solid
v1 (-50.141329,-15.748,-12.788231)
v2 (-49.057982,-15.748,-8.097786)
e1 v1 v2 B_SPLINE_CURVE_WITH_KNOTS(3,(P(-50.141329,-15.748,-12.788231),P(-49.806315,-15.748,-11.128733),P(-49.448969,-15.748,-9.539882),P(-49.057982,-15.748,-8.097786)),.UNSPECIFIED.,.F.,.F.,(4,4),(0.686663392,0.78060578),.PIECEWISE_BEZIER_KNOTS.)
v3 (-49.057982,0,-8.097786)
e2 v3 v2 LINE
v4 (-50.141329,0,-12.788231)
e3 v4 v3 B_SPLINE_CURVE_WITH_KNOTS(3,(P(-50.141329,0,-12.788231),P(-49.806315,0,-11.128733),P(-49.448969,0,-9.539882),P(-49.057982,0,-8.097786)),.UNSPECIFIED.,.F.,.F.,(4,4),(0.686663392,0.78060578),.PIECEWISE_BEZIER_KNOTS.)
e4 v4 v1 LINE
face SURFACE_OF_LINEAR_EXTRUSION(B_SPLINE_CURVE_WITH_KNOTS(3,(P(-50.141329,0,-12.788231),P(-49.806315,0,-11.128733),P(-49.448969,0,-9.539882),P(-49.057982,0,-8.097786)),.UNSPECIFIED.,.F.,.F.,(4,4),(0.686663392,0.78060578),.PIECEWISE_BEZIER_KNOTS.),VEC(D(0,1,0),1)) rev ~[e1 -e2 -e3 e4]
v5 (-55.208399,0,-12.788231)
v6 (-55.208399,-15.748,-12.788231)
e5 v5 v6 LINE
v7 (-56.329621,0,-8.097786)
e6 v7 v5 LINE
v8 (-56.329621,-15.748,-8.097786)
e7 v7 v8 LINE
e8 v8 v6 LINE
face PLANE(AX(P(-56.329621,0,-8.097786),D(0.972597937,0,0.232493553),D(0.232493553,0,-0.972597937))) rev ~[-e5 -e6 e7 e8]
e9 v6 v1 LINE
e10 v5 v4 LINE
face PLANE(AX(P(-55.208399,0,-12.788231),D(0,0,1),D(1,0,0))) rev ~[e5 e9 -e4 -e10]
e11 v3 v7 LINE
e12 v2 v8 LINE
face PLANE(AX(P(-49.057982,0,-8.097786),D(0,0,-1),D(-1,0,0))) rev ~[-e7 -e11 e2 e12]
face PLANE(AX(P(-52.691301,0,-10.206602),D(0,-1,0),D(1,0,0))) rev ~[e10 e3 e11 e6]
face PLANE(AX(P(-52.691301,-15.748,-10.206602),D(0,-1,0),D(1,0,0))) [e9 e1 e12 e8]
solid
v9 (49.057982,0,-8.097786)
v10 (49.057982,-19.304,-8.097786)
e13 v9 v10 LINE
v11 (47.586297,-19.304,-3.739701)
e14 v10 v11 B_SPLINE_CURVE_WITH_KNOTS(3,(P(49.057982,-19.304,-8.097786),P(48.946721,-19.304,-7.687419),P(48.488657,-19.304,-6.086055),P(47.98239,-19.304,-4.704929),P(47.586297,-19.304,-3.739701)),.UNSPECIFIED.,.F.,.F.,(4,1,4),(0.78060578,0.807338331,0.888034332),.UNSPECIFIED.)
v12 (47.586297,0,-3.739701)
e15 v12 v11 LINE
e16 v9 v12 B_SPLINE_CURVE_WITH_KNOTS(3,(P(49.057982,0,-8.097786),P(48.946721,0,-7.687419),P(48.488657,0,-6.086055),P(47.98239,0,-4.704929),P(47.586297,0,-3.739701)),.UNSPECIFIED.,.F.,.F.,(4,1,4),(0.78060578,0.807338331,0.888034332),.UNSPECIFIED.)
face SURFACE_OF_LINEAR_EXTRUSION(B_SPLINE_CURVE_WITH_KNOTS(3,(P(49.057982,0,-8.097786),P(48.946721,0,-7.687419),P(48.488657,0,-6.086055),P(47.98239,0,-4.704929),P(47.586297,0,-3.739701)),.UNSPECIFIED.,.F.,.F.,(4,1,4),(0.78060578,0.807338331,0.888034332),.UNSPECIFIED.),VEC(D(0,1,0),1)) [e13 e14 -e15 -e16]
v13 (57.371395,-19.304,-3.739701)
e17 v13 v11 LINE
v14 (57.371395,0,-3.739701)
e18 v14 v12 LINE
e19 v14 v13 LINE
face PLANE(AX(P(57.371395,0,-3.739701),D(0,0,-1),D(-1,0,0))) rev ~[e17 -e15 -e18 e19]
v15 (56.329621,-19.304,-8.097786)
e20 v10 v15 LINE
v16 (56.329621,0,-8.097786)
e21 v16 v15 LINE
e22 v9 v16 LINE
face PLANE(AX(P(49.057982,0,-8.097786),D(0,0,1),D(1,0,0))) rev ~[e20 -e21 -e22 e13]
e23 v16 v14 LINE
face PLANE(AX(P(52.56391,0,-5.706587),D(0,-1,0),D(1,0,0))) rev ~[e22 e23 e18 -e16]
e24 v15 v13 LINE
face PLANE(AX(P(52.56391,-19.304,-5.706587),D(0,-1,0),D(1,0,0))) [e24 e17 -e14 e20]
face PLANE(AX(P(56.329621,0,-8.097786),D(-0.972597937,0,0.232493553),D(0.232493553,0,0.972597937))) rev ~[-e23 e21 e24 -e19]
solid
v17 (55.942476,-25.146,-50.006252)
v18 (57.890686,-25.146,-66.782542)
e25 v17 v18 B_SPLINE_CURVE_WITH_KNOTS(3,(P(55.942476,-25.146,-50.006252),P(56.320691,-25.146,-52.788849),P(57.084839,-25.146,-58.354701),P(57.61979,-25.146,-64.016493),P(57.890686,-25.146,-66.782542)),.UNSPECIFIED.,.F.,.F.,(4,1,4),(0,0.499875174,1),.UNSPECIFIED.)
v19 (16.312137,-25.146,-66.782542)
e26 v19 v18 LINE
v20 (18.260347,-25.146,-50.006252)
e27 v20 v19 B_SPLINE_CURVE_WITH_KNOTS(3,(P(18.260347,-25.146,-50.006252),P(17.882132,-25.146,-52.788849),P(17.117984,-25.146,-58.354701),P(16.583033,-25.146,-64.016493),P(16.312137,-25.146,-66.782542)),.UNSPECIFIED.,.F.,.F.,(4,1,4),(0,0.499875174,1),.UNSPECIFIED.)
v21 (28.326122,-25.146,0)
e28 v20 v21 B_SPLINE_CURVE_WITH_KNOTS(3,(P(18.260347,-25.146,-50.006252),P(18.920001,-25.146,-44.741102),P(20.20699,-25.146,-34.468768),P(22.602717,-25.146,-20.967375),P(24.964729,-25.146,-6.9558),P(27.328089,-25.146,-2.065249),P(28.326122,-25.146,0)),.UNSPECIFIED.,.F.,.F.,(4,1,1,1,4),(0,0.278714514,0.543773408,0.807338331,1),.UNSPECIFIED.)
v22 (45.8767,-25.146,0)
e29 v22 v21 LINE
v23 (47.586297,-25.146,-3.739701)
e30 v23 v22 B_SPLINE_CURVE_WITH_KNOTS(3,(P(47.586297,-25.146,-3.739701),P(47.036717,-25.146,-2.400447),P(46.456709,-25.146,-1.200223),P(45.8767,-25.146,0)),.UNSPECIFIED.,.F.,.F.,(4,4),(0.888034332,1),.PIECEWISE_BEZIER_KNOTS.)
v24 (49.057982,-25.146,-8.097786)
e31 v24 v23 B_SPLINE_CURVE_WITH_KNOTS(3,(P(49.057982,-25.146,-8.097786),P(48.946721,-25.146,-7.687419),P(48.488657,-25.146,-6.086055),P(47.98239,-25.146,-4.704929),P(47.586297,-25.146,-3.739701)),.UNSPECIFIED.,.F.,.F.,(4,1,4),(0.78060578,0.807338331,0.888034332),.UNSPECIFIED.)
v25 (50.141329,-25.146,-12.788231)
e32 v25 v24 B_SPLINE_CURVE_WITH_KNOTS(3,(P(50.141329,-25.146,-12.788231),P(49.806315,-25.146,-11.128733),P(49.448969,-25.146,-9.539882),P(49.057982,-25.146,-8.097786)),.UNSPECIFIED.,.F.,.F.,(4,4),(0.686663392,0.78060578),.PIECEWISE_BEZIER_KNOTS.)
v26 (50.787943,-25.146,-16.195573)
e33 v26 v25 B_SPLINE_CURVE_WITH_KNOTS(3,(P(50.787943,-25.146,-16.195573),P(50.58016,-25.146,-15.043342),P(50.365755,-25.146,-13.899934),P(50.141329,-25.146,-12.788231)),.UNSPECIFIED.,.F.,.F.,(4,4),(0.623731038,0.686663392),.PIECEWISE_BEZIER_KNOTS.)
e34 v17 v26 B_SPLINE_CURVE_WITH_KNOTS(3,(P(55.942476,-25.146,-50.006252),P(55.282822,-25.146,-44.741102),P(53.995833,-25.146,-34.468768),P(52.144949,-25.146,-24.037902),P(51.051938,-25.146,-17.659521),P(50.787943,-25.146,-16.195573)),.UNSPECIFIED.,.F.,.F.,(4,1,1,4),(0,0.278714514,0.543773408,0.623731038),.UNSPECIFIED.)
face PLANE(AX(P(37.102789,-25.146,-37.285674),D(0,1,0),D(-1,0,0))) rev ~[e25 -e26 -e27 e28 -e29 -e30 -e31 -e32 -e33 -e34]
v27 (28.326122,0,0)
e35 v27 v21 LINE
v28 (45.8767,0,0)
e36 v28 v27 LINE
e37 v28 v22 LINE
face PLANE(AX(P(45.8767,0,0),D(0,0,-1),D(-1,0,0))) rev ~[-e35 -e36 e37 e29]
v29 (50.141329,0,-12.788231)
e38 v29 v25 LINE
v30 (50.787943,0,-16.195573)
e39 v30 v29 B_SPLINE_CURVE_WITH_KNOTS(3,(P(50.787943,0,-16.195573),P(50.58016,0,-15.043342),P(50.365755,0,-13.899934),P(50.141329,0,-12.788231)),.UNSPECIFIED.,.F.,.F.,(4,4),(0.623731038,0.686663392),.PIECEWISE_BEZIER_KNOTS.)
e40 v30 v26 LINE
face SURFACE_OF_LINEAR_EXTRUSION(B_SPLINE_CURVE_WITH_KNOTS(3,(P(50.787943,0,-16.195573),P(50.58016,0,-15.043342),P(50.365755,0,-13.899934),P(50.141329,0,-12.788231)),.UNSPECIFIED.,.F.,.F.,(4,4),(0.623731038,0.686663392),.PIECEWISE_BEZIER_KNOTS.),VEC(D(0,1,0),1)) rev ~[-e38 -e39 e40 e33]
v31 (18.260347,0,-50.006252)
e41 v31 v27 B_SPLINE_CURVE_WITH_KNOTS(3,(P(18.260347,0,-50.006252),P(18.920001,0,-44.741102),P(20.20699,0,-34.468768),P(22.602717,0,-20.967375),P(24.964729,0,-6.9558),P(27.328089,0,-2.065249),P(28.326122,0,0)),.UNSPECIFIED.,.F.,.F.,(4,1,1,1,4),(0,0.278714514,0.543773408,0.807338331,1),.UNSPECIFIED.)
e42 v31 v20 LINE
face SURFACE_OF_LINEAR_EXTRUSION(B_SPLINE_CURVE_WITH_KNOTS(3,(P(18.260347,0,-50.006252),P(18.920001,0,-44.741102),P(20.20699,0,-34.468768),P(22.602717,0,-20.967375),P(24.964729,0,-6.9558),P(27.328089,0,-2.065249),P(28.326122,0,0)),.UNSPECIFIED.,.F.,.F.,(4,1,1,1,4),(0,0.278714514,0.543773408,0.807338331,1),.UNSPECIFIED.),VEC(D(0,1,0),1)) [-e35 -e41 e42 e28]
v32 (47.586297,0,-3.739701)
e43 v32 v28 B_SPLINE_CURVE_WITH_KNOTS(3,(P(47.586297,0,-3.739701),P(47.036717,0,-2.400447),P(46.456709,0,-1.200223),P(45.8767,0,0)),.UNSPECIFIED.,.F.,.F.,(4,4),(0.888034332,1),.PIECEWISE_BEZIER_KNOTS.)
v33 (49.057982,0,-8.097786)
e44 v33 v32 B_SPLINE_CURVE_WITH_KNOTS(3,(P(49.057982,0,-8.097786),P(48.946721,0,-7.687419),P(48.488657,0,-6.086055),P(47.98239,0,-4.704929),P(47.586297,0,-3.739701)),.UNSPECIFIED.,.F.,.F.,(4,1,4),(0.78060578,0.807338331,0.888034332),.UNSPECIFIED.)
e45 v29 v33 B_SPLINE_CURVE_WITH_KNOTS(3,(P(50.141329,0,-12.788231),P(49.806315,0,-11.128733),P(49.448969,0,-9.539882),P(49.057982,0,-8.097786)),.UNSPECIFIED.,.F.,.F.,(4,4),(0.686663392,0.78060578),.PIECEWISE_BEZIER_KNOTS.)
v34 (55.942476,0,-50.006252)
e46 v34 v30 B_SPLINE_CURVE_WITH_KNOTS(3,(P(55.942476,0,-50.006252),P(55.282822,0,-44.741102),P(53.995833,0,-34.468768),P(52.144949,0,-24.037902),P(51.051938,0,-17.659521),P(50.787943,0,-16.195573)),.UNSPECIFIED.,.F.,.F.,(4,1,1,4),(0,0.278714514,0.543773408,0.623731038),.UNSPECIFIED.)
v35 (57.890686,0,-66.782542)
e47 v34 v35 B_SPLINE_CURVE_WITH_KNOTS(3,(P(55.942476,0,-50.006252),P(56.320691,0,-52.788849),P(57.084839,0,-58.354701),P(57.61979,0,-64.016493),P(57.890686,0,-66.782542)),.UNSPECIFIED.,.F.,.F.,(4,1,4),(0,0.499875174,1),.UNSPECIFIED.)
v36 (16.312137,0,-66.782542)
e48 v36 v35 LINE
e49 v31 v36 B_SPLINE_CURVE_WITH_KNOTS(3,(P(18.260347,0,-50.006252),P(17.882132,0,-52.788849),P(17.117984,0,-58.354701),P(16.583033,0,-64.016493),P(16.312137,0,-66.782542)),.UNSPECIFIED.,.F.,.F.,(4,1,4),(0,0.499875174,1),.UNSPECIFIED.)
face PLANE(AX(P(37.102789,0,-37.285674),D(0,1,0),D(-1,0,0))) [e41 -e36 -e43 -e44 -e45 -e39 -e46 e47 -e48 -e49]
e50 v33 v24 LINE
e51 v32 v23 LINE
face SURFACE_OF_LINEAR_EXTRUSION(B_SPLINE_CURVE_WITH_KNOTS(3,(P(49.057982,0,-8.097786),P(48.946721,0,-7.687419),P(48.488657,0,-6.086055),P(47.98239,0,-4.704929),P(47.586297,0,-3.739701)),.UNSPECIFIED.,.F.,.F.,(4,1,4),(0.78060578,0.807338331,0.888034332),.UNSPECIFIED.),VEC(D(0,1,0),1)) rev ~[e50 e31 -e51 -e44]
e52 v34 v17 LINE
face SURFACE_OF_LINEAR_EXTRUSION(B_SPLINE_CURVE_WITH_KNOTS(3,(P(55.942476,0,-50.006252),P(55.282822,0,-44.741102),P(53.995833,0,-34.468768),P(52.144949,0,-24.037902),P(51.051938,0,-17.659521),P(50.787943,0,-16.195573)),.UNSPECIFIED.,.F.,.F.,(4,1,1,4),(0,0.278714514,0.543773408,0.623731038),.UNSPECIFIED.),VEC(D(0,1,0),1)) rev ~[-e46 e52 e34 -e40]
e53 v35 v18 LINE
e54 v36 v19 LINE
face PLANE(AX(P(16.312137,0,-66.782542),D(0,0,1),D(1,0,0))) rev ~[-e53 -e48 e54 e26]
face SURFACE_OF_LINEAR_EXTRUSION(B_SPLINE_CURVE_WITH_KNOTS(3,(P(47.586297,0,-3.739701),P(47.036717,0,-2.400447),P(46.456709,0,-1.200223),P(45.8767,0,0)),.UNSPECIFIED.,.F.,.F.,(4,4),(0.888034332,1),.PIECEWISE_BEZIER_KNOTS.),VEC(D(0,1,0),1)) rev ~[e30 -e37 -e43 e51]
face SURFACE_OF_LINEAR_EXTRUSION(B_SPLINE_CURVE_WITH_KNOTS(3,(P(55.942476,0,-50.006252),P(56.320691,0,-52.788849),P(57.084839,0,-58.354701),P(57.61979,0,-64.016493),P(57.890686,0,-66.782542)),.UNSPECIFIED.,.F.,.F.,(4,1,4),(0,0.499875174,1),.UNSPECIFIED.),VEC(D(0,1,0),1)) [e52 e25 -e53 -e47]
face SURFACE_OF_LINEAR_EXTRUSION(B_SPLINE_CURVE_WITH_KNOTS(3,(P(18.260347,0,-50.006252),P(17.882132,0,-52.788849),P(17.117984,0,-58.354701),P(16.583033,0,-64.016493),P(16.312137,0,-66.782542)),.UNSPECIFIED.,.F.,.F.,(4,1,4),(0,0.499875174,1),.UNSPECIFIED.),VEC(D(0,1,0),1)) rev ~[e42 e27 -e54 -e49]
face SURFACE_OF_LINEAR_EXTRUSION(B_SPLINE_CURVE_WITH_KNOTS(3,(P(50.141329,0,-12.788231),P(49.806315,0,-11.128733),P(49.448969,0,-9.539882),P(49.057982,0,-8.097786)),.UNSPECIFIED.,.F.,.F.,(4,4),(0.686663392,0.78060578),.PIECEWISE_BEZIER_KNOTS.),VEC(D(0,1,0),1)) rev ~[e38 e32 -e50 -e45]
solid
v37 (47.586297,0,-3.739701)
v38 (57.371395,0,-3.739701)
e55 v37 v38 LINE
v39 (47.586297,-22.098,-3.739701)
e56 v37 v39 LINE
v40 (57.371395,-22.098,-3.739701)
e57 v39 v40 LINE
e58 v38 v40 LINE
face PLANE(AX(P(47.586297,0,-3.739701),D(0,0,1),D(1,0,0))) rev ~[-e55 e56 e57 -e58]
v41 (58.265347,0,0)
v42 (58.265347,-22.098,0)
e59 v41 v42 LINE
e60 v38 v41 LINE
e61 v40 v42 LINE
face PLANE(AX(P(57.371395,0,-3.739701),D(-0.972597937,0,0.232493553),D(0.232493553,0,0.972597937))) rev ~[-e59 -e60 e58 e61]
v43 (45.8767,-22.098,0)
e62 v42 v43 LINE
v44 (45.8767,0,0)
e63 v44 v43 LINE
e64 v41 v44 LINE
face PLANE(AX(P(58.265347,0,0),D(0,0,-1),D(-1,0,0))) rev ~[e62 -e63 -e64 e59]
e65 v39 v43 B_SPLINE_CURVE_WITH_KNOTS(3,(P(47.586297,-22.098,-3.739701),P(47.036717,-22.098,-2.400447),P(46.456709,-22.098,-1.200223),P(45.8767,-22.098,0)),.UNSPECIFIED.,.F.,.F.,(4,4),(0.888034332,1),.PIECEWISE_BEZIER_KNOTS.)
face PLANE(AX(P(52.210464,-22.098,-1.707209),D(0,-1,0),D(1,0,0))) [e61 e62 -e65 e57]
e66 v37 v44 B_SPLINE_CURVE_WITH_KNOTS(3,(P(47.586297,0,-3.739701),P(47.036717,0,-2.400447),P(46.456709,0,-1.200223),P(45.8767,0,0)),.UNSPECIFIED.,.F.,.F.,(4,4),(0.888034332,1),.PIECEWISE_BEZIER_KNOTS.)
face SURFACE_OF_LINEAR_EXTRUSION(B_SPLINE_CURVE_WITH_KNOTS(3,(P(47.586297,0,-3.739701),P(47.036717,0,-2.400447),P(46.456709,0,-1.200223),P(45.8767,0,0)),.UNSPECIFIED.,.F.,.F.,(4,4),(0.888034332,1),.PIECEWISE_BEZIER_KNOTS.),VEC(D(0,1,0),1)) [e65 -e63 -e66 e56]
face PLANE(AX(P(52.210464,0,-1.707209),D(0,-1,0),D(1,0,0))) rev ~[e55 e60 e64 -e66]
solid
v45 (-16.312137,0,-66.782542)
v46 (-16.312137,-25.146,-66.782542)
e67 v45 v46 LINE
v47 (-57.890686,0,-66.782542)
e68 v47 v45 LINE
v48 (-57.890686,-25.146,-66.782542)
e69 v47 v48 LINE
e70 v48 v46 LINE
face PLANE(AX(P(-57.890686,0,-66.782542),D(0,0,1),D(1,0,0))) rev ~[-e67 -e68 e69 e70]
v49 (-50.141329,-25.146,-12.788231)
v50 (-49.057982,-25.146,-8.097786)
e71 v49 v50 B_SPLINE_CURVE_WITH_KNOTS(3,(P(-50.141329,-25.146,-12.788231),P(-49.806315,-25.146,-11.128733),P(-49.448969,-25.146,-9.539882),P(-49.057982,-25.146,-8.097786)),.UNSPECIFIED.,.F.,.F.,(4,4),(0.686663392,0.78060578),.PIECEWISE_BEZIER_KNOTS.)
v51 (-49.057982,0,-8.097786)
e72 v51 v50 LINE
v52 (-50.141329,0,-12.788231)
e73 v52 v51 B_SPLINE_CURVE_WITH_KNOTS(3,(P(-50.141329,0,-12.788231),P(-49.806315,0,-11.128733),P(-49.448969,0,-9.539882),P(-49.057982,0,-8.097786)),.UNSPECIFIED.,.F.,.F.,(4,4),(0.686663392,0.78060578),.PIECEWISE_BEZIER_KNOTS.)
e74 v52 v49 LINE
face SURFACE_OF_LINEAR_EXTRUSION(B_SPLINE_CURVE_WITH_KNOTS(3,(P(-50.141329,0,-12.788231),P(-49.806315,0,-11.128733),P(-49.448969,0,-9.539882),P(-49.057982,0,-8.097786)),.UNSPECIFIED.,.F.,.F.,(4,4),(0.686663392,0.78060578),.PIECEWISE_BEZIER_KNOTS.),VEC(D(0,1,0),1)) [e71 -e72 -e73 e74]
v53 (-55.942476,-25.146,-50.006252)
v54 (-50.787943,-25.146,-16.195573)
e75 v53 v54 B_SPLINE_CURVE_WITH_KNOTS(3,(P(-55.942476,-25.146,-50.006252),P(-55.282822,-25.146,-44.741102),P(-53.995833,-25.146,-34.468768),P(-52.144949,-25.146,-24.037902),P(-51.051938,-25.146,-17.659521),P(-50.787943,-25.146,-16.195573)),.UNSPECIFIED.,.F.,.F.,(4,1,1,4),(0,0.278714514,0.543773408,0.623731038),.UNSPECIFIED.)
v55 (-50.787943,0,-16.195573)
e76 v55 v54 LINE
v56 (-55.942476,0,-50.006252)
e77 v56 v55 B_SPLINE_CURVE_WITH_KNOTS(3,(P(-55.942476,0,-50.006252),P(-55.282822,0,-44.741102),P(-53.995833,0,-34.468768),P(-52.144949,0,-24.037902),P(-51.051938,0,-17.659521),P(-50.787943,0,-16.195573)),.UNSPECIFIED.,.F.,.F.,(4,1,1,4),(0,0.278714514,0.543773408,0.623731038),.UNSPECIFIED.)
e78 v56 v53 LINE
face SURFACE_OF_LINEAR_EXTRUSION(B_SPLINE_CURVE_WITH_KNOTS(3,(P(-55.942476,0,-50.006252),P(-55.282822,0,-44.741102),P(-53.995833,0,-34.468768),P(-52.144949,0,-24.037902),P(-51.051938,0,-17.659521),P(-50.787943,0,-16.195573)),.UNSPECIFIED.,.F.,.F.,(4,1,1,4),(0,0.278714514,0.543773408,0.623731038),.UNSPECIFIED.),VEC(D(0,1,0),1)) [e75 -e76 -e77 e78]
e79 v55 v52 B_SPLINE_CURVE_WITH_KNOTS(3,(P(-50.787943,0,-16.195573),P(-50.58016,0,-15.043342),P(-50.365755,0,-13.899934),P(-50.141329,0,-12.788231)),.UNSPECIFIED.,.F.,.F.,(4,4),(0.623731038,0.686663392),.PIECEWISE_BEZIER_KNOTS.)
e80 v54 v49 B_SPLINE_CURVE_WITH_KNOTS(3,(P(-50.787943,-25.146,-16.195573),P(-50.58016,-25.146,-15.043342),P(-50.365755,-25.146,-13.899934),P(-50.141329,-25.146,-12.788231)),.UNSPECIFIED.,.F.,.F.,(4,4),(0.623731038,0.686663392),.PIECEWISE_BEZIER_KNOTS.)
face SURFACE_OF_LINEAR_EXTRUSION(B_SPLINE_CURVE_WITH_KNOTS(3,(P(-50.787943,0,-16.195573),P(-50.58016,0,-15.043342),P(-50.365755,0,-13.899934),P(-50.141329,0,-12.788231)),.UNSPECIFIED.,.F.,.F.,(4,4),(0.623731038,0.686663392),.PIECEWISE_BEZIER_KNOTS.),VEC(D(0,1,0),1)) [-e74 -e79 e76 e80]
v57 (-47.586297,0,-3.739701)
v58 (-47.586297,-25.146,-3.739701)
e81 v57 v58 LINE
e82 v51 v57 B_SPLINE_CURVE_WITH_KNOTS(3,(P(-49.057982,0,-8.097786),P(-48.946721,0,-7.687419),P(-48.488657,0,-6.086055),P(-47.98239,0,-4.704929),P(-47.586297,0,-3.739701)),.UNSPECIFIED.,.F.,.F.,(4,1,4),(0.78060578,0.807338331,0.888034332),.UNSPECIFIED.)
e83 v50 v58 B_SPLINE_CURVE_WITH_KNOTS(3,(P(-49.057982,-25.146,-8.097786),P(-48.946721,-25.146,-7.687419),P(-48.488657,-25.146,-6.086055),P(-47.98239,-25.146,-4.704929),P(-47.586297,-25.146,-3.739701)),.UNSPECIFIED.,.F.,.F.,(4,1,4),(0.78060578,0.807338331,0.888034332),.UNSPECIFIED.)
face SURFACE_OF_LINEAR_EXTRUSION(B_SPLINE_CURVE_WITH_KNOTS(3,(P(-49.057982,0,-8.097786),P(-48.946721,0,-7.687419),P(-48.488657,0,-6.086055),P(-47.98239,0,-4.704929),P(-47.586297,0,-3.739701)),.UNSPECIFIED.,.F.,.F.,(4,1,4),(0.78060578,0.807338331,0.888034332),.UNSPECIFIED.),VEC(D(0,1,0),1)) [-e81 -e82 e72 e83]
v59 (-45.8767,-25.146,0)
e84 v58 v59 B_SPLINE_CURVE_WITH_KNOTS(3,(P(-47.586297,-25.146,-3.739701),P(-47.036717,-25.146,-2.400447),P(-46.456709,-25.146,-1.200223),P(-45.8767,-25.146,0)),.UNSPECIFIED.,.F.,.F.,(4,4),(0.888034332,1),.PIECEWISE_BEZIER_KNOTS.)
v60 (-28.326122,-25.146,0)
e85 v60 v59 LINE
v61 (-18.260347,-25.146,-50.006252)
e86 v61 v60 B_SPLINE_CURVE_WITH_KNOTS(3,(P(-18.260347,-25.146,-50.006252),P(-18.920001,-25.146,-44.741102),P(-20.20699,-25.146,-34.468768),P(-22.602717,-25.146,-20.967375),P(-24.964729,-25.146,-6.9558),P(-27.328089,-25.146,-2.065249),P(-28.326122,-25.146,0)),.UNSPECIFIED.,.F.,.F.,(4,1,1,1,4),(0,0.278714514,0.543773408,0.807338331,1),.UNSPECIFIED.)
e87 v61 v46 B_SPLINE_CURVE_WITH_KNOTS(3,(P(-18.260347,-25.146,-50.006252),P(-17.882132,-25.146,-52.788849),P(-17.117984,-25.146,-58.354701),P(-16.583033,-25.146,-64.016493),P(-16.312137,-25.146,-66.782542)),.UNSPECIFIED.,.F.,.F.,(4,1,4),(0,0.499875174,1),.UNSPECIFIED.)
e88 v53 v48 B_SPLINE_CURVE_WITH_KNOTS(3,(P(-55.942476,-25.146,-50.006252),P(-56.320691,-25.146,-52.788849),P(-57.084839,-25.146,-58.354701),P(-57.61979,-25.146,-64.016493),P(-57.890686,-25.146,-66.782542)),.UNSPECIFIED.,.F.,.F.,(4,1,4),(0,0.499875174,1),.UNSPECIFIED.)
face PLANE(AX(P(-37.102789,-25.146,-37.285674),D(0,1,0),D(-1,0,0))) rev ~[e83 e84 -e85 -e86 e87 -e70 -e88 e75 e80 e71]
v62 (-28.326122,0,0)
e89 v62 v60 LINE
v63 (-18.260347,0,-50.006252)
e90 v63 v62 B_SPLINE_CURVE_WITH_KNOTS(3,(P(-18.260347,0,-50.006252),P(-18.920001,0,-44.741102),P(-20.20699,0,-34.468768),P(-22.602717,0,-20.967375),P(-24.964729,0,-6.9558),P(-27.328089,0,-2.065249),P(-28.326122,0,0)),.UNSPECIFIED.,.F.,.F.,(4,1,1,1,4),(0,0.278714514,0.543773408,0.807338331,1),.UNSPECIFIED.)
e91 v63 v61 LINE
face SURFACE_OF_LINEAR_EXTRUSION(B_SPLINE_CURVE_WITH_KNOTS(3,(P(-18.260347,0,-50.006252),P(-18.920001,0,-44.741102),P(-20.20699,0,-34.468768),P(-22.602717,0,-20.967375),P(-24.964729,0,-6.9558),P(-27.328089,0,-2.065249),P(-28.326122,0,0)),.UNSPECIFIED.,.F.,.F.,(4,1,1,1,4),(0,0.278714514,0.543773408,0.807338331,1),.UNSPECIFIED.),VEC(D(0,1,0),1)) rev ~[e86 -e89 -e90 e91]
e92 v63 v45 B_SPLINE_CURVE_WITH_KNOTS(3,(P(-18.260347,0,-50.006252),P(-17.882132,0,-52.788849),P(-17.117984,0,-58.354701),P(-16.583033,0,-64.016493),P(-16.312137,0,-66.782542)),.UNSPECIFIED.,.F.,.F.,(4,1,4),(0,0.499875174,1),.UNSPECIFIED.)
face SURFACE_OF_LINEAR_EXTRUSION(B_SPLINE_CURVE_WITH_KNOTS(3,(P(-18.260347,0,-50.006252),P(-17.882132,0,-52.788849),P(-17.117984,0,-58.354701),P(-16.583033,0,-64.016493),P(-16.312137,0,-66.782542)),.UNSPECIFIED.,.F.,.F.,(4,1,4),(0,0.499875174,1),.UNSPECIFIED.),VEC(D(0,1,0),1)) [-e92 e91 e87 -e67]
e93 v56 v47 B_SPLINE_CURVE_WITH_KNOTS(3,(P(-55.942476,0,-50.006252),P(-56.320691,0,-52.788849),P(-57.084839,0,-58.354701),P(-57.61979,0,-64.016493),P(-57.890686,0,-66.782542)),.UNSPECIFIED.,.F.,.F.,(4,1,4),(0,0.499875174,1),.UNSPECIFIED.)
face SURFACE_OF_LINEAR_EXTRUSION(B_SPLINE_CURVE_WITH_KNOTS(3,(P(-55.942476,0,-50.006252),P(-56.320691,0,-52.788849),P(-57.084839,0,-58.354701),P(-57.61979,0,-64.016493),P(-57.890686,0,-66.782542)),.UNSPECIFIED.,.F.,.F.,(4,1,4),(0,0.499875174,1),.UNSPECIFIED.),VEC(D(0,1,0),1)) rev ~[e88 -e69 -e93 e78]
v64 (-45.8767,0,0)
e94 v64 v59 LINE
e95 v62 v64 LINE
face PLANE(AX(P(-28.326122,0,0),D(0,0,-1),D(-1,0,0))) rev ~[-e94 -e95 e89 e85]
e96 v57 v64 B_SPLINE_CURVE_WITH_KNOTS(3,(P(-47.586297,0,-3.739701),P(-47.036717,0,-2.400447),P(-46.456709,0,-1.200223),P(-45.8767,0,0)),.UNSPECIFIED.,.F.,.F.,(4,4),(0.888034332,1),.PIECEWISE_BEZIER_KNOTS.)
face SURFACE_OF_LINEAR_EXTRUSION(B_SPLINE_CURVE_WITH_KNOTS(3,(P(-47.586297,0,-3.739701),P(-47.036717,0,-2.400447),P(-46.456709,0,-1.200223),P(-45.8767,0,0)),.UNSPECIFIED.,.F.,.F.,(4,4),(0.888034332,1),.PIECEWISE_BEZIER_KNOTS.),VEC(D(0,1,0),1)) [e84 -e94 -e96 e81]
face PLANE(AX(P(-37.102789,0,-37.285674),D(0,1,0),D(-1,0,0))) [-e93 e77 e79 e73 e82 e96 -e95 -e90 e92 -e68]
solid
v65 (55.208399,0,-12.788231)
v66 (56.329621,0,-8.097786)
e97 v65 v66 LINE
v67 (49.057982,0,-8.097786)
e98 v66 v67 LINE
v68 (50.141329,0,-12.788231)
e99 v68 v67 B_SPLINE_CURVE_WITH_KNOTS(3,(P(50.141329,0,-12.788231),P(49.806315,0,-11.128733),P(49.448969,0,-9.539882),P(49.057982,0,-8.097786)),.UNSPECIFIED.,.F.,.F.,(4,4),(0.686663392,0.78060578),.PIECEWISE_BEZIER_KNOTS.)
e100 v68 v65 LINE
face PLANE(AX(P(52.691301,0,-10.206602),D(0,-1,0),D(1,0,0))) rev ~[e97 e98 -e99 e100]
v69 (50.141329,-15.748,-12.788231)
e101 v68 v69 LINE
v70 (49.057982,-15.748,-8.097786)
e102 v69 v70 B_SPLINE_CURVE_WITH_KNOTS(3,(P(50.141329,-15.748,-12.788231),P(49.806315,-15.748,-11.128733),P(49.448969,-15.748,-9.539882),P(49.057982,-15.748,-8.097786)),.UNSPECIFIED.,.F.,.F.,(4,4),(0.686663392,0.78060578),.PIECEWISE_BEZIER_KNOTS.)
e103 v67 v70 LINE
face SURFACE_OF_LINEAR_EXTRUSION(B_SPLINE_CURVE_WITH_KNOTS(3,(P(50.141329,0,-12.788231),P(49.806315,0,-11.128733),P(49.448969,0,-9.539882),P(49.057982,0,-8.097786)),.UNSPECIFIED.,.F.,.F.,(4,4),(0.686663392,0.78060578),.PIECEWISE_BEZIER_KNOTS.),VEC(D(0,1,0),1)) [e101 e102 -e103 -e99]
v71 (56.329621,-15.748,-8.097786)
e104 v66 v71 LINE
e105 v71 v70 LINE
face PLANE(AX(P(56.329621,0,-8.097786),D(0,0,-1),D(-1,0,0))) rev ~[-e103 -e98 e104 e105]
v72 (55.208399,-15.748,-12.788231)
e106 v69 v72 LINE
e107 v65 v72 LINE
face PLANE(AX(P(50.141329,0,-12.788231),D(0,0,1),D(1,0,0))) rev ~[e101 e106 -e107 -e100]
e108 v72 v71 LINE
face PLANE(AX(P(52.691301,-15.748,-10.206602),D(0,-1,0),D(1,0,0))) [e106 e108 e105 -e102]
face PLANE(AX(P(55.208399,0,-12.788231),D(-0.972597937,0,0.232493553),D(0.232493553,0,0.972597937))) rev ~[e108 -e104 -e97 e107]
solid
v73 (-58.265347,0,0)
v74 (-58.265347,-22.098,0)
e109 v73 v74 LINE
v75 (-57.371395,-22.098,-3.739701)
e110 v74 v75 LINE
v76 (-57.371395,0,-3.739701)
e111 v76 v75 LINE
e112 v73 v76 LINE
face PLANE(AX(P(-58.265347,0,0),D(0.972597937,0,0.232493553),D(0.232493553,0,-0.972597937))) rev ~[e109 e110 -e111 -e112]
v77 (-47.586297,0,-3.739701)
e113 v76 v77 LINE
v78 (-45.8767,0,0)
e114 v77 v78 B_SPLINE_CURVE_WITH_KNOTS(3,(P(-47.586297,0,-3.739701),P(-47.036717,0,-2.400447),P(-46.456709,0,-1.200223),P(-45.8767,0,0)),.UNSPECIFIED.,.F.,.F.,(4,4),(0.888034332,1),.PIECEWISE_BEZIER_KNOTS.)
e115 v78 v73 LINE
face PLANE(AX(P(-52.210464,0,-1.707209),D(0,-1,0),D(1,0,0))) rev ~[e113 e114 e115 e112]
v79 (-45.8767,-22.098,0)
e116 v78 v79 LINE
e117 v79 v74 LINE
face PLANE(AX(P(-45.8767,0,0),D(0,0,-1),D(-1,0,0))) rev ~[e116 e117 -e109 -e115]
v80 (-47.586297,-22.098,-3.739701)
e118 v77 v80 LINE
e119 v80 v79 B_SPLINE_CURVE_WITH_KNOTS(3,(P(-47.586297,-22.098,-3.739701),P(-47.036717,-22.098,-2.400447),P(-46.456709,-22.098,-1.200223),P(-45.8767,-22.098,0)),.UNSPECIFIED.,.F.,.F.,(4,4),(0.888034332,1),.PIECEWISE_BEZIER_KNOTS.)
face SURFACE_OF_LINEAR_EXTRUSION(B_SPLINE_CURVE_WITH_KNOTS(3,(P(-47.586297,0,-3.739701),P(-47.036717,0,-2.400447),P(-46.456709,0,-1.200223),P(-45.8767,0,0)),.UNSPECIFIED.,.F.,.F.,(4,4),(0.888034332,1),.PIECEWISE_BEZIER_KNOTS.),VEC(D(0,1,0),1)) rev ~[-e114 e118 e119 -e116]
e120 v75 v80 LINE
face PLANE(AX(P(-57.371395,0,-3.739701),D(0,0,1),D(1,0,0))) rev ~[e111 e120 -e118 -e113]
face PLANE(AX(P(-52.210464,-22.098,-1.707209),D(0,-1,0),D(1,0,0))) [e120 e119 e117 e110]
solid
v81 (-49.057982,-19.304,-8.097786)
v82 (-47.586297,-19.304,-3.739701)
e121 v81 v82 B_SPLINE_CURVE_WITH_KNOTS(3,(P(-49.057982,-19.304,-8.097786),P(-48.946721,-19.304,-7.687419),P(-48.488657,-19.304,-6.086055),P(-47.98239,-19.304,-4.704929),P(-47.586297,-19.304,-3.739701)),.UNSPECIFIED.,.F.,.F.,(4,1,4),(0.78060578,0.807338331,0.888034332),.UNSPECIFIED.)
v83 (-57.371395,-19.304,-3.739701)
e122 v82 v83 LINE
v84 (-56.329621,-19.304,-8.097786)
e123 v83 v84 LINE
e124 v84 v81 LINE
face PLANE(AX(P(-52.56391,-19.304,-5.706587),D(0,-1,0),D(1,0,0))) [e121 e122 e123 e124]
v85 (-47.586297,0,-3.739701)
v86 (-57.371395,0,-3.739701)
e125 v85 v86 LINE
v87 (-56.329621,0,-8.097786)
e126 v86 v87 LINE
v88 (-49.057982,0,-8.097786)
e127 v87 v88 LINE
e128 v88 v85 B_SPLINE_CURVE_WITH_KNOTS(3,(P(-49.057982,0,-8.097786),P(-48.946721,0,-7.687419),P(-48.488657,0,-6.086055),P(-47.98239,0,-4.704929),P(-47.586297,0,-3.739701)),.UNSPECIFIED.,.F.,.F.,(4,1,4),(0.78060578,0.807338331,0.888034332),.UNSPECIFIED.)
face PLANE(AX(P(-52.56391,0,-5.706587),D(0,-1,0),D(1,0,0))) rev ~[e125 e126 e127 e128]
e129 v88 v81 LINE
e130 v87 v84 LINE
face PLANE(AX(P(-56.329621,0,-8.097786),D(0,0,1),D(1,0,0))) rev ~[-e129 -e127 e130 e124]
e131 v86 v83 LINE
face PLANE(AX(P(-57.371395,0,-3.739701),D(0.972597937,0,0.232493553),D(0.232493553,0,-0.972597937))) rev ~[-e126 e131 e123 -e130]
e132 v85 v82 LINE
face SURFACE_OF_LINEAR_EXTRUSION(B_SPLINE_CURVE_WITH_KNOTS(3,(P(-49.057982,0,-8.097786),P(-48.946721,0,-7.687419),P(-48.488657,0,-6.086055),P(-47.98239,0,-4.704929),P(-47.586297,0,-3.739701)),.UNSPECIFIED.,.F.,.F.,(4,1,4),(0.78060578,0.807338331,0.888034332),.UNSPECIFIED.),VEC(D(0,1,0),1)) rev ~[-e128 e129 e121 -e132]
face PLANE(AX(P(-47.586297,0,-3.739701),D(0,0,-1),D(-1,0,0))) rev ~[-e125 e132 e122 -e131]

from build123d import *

# Parameters (mm, degrees)
F1_DEPTH = 25.146
F2_DEPTH = 22.098
F3_DEPTH = 19.304
F4_DEPTH = 15.748


# Not quite as in the source:
# - a feature names something its author has since deleted; it is built from what else it names


with BuildPart() as f1:
    # F0 (on Front) → F1 (new body)
    with BuildSketch(Plane.XZ):
        with BuildLine():
            add(Edge.make_bspline(
                [(18.2603467256, -50.0062517822), (18.9200009821, -44.7411017766), (20.2069897283, -34.4687678414), (22.6027171981, -20.9673750462), (24.964728506, -6.9558000416), (27.3280893956, -2.0652493334), (28.3261220902, 0)],
                knots=[0, 0, 0, 0, 0.2787145144, 0.5437734084, 0.8073383305, 1, 1, 1, 1], degree=3))
            add(Edge.make_bspline(
                [(18.2603467256, -50.0062517822), (17.8821318051, -52.7888494967), (17.1179839852, -58.354700738), (16.5830328982, -64.0164932483), (16.3121369904, -66.782541573)],
                knots=[0, 0, 0, 0, 0.4998751742, 1, 1, 1, 1], degree=3))
            Line((16.3121369904, -66.782541573), (37.1014112607, -66.782541573))
            Line((37.1014112607, -66.782541573), (57.890685531, -66.782541573))
            add(Edge.make_bspline(
                [(55.9424757957, -50.0062517822), (56.3206907163, -52.7888494967), (57.0848385361, -58.354700738), (57.6197896231, -64.0164932483), (57.890685531, -66.782541573)],
                knots=[0, 0, 0, 0, 0.4998751742, 1, 1, 1, 1], degree=3))
            add(Edge.make_bspline(
                [(55.9424757957, -50.0062517822), (55.2828215393, -44.7411017766), (53.995832793, -34.4687678414), (52.1449488151, -24.0379020943), (51.0519382112, -17.6595205046), (50.787943229, -16.1955729126)],
                knots=[0, 0, 0, 0, 0.2787145144, 0.5437734084, 0.6237310377, 0.6237310377, 0.6237310377, 0.6237310377], degree=3))
            add(Edge.make_bspline(
                [(50.787943229, -16.1955729126), (50.5801603578, -15.0433417924), (50.3657554699, -13.8999341074), (50.1413285617, -12.7882305847)],
                knots=[0.6237310377, 0.6237310377, 0.6237310377, 0.6237310377, 0.6866633921, 0.6866633921, 0.6866633921, 0.6866633921], degree=3))
            add(Edge.make_bspline(
                [(50.1413285617, -12.7882305847), (49.8063148795, -11.1287330959), (49.4489690484, -9.5398822483), (49.0579815986, -8.0977864563)],
                knots=[0.6866633921, 0.6866633921, 0.6866633921, 0.6866633921, 0.7806057805, 0.7806057805, 0.7806057805, 0.7806057805], degree=3))
            add(Edge.make_bspline(
                [(49.0579815986, -8.0977864563), (48.9467209446, -7.6874190111), (48.4886567249, -6.0860553408), (47.9823899415, -4.7049290916), (47.5862966388, -3.7397006431)],
                knots=[0.7806057805, 0.7806057805, 0.7806057805, 0.7806057805, 0.8073383305, 0.8880343317, 0.8880343317, 0.8880343317, 0.8880343317], degree=3))
            add(Edge.make_bspline(
                [(47.5862966388, -3.7397006431), (47.0367173451, -2.4004465697), (46.4567088881, -1.2002232848), (45.8767004311, 0)],
                knots=[0.8880343317, 0.8880343317, 0.8880343317, 0.8880343317, 1, 1, 1, 1], degree=3))
            Line((45.8767004311, 0), (28.3261220902, 0))
        make_face()
    extrude(amount=F1_DEPTH)


with BuildPart() as f1b:
    # F0 (on Front) → F1, piece 2 (new body)
    with BuildSketch(Plane.XZ):
        with BuildLine():
            add(Edge.make_bspline(
                [(-55.9424757957, -50.0062517822), (-55.2828215393, -44.7411017766), (-53.995832793, -34.4687678414), (-52.1449488151, -24.0379020943), (-51.0519382112, -17.6595205046), (-50.787943229, -16.1955729126)],
                knots=[0, 0, 0, 0, 0.2787145144, 0.5437734084, 0.6237310377, 0.6237310377, 0.6237310377, 0.6237310377], degree=3))
            add(Edge.make_bspline(
                [(-55.9424757957, -50.0062517822), (-56.3206907163, -52.7888494967), (-57.0848385361, -58.354700738), (-57.6197896231, -64.0164932483), (-57.890685531, -66.782541573)],
                knots=[0, 0, 0, 0, 0.4998751742, 1, 1, 1, 1], degree=3))
            Line((-57.890685531, -66.782541573), (-37.1014112607, -66.782541573))
            Line((-37.1014112607, -66.782541573), (-16.3121369904, -66.782541573))
            add(Edge.make_bspline(
                [(-18.2603467256, -50.0062517822), (-17.8821318051, -52.7888494967), (-17.1179839852, -58.354700738), (-16.5830328982, -64.0164932483), (-16.3121369904, -66.782541573)],
                knots=[0, 0, 0, 0, 0.4998751742, 1, 1, 1, 1], degree=3))
            add(Edge.make_bspline(
                [(-18.2603467256, -50.0062517822), (-18.9200009821, -44.7411017766), (-20.2069897283, -34.4687678414), (-22.6027171981, -20.9673750462), (-24.964728506, -6.9558000416), (-27.3280893956, -2.0652493334), (-28.3261220902, 0)],
                knots=[0, 0, 0, 0, 0.2787145144, 0.5437734084, 0.8073383305, 1, 1, 1, 1], degree=3))
            Line((-28.3261220902, 0), (-45.8767004311, 0))
            add(Edge.make_bspline(
                [(-47.5862966388, -3.7397006431), (-47.0367173451, -2.4004465697), (-46.4567088881, -1.2002232848), (-45.8767004311, 0)],
                knots=[0.8880343317, 0.8880343317, 0.8880343317, 0.8880343317, 1, 1, 1, 1], degree=3))
            add(Edge.make_bspline(
                [(-49.0579815986, -8.0977864563), (-48.9467209446, -7.6874190111), (-48.4886567249, -6.0860553408), (-47.9823899415, -4.7049290916), (-47.5862966388, -3.7397006431)],
                knots=[0.7806057805, 0.7806057805, 0.7806057805, 0.7806057805, 0.8073383305, 0.8880343317, 0.8880343317, 0.8880343317, 0.8880343317], degree=3))
            add(Edge.make_bspline(
                [(-50.1413285617, -12.7882305847), (-49.8063148795, -11.1287330959), (-49.4489690484, -9.5398822483), (-49.0579815986, -8.0977864563)],
                knots=[0.6866633921, 0.6866633921, 0.6866633921, 0.6866633921, 0.7806057805, 0.7806057805, 0.7806057805, 0.7806057805], degree=3))
            add(Edge.make_bspline(
                [(-50.787943229, -16.1955729126), (-50.5801603578, -15.0433417924), (-50.3657554699, -13.8999341074), (-50.1413285617, -12.7882305847)],
                knots=[0.6237310377, 0.6237310377, 0.6237310377, 0.6237310377, 0.6866633921, 0.6866633921, 0.6866633921, 0.6866633921], degree=3))
        make_face()
    extrude(amount=F1_DEPTH)


with BuildPart() as f2:
    # F0 (on Front) → F2 (new body)
    with BuildSketch(Plane.XZ):
        with BuildLine():
            Line((58.2653470337, 0), (45.8767004311, 0))
            add(Edge.make_bspline(
                [(47.5862966388, -3.7397006431), (47.0367173451, -2.4004465697), (46.4567088881, -1.2002232848), (45.8767004311, 0)],
                knots=[0.8880343317, 0.8880343317, 0.8880343317, 0.8880343317, 1, 1, 1, 1], degree=3))
            Line((47.5862966388, -3.7397006431), (57.3713946033, -3.7397006431))
            Line((57.3713946033, -3.7397006431), (58.2653470337, 0))
        make_face()
    extrude(amount=F2_DEPTH)


with BuildPart() as f2b:
    # F0 (on Front) → F2, piece 2 (new body)
    with BuildSketch(Plane.XZ):
        with BuildLine():
            Line((-57.3713946033, -3.7397006431), (-47.5862966388, -3.7397006431))
            add(Edge.make_bspline(
                [(-47.5862966388, -3.7397006431), (-47.0367173451, -2.4004465697), (-46.4567088881, -1.2002232848), (-45.8767004311, 0)],
                knots=[0.8880343317, 0.8880343317, 0.8880343317, 0.8880343317, 1, 1, 1, 1], degree=3))
            Line((-45.8767004311, 0), (-58.2653470337, 0))
            Line((-58.2653470337, 0), (-57.3713946033, -3.7397006431))
        make_face()
    extrude(amount=F2_DEPTH)


with BuildPart() as f3:
    # F0 (on Front) → F3 (new body)
    with BuildSketch(Plane.XZ):
        with BuildLine():
            Line((57.3713946033, -3.7397006431), (47.5862966388, -3.7397006431))
            add(Edge.make_bspline(
                [(49.0579815986, -8.0977864563), (48.9467209446, -7.6874190111), (48.4886567249, -6.0860553408), (47.9823899415, -4.7049290916), (47.5862966388, -3.7397006431)],
                knots=[0.7806057805, 0.7806057805, 0.7806057805, 0.7806057805, 0.8073383305, 0.8880343317, 0.8880343317, 0.8880343317, 0.8880343317], degree=3))
            Line((49.0579815986, -8.0977864563), (56.3296210025, -8.0977864563))
            Line((56.3296210025, -8.0977864563), (57.3713946033, -3.7397006431))
        make_face()
    extrude(amount=F3_DEPTH)


with BuildPart() as f3b:
    # F0 (on Front) → F3, piece 2 (new body)
    with BuildSketch(Plane.XZ):
        with BuildLine():
            Line((-56.3296210025, -8.0977864563), (-49.0579815986, -8.0977864563))
            add(Edge.make_bspline(
                [(-49.0579815986, -8.0977864563), (-48.9467209446, -7.6874190111), (-48.4886567249, -6.0860553408), (-47.9823899415, -4.7049290916), (-47.5862966388, -3.7397006431)],
                knots=[0.7806057805, 0.7806057805, 0.7806057805, 0.7806057805, 0.8073383305, 0.8880343317, 0.8880343317, 0.8880343317, 0.8880343317], degree=3))
            Line((-47.5862966388, -3.7397006431), (-57.3713946033, -3.7397006431))
            Line((-57.3713946033, -3.7397006431), (-56.3296210025, -8.0977864563))
        make_face()
    extrude(amount=F3_DEPTH)


with BuildPart() as f4:
    # F0 (on Front) → F4 (new body)
    with BuildSketch(Plane.XZ):
        with BuildLine():
            Line((-55.2083991912, -12.7882305847), (-50.1413285617, -12.7882305847))
            add(Edge.make_bspline(
                [(-50.1413285617, -12.7882305847), (-49.8063148795, -11.1287330959), (-49.4489690484, -9.5398822483), (-49.0579815986, -8.0977864563)],
                knots=[0.6866633921, 0.6866633921, 0.6866633921, 0.6866633921, 0.7806057805, 0.7806057805, 0.7806057805, 0.7806057805], degree=3))
            Line((-49.0579815986, -8.0977864563), (-56.3296210025, -8.0977864563))
            Line((-56.3296210025, -8.0977864563), (-55.2083991912, -12.7882305847))
        make_face()
    extrude(amount=F4_DEPTH)


with BuildPart() as f4b:
    # F0 (on Front) → F4, piece 2 (new body)
    with BuildSketch(Plane.XZ):
        with BuildLine():
            Line((56.3296210025, -8.0977864563), (49.0579815986, -8.0977864563))
            add(Edge.make_bspline(
                [(50.1413285617, -12.7882305847), (49.8063148795, -11.1287330959), (49.4489690484, -9.5398822483), (49.0579815986, -8.0977864563)],
                knots=[0.6866633921, 0.6866633921, 0.6866633921, 0.6866633921, 0.7806057805, 0.7806057805, 0.7806057805, 0.7806057805], degree=3))
            Line((50.1413285617, -12.7882305847), (55.2083991912, -12.7882305847))
            Line((55.2083991912, -12.7882305847), (56.3296210025, -8.0977864563))
        make_face()
    extrude(amount=F4_DEPTH)


solid = Compound([f1.part, f1b.part, f2.part, f2b.part, f3.part, f3b.part, f4.part, f4b.part])
